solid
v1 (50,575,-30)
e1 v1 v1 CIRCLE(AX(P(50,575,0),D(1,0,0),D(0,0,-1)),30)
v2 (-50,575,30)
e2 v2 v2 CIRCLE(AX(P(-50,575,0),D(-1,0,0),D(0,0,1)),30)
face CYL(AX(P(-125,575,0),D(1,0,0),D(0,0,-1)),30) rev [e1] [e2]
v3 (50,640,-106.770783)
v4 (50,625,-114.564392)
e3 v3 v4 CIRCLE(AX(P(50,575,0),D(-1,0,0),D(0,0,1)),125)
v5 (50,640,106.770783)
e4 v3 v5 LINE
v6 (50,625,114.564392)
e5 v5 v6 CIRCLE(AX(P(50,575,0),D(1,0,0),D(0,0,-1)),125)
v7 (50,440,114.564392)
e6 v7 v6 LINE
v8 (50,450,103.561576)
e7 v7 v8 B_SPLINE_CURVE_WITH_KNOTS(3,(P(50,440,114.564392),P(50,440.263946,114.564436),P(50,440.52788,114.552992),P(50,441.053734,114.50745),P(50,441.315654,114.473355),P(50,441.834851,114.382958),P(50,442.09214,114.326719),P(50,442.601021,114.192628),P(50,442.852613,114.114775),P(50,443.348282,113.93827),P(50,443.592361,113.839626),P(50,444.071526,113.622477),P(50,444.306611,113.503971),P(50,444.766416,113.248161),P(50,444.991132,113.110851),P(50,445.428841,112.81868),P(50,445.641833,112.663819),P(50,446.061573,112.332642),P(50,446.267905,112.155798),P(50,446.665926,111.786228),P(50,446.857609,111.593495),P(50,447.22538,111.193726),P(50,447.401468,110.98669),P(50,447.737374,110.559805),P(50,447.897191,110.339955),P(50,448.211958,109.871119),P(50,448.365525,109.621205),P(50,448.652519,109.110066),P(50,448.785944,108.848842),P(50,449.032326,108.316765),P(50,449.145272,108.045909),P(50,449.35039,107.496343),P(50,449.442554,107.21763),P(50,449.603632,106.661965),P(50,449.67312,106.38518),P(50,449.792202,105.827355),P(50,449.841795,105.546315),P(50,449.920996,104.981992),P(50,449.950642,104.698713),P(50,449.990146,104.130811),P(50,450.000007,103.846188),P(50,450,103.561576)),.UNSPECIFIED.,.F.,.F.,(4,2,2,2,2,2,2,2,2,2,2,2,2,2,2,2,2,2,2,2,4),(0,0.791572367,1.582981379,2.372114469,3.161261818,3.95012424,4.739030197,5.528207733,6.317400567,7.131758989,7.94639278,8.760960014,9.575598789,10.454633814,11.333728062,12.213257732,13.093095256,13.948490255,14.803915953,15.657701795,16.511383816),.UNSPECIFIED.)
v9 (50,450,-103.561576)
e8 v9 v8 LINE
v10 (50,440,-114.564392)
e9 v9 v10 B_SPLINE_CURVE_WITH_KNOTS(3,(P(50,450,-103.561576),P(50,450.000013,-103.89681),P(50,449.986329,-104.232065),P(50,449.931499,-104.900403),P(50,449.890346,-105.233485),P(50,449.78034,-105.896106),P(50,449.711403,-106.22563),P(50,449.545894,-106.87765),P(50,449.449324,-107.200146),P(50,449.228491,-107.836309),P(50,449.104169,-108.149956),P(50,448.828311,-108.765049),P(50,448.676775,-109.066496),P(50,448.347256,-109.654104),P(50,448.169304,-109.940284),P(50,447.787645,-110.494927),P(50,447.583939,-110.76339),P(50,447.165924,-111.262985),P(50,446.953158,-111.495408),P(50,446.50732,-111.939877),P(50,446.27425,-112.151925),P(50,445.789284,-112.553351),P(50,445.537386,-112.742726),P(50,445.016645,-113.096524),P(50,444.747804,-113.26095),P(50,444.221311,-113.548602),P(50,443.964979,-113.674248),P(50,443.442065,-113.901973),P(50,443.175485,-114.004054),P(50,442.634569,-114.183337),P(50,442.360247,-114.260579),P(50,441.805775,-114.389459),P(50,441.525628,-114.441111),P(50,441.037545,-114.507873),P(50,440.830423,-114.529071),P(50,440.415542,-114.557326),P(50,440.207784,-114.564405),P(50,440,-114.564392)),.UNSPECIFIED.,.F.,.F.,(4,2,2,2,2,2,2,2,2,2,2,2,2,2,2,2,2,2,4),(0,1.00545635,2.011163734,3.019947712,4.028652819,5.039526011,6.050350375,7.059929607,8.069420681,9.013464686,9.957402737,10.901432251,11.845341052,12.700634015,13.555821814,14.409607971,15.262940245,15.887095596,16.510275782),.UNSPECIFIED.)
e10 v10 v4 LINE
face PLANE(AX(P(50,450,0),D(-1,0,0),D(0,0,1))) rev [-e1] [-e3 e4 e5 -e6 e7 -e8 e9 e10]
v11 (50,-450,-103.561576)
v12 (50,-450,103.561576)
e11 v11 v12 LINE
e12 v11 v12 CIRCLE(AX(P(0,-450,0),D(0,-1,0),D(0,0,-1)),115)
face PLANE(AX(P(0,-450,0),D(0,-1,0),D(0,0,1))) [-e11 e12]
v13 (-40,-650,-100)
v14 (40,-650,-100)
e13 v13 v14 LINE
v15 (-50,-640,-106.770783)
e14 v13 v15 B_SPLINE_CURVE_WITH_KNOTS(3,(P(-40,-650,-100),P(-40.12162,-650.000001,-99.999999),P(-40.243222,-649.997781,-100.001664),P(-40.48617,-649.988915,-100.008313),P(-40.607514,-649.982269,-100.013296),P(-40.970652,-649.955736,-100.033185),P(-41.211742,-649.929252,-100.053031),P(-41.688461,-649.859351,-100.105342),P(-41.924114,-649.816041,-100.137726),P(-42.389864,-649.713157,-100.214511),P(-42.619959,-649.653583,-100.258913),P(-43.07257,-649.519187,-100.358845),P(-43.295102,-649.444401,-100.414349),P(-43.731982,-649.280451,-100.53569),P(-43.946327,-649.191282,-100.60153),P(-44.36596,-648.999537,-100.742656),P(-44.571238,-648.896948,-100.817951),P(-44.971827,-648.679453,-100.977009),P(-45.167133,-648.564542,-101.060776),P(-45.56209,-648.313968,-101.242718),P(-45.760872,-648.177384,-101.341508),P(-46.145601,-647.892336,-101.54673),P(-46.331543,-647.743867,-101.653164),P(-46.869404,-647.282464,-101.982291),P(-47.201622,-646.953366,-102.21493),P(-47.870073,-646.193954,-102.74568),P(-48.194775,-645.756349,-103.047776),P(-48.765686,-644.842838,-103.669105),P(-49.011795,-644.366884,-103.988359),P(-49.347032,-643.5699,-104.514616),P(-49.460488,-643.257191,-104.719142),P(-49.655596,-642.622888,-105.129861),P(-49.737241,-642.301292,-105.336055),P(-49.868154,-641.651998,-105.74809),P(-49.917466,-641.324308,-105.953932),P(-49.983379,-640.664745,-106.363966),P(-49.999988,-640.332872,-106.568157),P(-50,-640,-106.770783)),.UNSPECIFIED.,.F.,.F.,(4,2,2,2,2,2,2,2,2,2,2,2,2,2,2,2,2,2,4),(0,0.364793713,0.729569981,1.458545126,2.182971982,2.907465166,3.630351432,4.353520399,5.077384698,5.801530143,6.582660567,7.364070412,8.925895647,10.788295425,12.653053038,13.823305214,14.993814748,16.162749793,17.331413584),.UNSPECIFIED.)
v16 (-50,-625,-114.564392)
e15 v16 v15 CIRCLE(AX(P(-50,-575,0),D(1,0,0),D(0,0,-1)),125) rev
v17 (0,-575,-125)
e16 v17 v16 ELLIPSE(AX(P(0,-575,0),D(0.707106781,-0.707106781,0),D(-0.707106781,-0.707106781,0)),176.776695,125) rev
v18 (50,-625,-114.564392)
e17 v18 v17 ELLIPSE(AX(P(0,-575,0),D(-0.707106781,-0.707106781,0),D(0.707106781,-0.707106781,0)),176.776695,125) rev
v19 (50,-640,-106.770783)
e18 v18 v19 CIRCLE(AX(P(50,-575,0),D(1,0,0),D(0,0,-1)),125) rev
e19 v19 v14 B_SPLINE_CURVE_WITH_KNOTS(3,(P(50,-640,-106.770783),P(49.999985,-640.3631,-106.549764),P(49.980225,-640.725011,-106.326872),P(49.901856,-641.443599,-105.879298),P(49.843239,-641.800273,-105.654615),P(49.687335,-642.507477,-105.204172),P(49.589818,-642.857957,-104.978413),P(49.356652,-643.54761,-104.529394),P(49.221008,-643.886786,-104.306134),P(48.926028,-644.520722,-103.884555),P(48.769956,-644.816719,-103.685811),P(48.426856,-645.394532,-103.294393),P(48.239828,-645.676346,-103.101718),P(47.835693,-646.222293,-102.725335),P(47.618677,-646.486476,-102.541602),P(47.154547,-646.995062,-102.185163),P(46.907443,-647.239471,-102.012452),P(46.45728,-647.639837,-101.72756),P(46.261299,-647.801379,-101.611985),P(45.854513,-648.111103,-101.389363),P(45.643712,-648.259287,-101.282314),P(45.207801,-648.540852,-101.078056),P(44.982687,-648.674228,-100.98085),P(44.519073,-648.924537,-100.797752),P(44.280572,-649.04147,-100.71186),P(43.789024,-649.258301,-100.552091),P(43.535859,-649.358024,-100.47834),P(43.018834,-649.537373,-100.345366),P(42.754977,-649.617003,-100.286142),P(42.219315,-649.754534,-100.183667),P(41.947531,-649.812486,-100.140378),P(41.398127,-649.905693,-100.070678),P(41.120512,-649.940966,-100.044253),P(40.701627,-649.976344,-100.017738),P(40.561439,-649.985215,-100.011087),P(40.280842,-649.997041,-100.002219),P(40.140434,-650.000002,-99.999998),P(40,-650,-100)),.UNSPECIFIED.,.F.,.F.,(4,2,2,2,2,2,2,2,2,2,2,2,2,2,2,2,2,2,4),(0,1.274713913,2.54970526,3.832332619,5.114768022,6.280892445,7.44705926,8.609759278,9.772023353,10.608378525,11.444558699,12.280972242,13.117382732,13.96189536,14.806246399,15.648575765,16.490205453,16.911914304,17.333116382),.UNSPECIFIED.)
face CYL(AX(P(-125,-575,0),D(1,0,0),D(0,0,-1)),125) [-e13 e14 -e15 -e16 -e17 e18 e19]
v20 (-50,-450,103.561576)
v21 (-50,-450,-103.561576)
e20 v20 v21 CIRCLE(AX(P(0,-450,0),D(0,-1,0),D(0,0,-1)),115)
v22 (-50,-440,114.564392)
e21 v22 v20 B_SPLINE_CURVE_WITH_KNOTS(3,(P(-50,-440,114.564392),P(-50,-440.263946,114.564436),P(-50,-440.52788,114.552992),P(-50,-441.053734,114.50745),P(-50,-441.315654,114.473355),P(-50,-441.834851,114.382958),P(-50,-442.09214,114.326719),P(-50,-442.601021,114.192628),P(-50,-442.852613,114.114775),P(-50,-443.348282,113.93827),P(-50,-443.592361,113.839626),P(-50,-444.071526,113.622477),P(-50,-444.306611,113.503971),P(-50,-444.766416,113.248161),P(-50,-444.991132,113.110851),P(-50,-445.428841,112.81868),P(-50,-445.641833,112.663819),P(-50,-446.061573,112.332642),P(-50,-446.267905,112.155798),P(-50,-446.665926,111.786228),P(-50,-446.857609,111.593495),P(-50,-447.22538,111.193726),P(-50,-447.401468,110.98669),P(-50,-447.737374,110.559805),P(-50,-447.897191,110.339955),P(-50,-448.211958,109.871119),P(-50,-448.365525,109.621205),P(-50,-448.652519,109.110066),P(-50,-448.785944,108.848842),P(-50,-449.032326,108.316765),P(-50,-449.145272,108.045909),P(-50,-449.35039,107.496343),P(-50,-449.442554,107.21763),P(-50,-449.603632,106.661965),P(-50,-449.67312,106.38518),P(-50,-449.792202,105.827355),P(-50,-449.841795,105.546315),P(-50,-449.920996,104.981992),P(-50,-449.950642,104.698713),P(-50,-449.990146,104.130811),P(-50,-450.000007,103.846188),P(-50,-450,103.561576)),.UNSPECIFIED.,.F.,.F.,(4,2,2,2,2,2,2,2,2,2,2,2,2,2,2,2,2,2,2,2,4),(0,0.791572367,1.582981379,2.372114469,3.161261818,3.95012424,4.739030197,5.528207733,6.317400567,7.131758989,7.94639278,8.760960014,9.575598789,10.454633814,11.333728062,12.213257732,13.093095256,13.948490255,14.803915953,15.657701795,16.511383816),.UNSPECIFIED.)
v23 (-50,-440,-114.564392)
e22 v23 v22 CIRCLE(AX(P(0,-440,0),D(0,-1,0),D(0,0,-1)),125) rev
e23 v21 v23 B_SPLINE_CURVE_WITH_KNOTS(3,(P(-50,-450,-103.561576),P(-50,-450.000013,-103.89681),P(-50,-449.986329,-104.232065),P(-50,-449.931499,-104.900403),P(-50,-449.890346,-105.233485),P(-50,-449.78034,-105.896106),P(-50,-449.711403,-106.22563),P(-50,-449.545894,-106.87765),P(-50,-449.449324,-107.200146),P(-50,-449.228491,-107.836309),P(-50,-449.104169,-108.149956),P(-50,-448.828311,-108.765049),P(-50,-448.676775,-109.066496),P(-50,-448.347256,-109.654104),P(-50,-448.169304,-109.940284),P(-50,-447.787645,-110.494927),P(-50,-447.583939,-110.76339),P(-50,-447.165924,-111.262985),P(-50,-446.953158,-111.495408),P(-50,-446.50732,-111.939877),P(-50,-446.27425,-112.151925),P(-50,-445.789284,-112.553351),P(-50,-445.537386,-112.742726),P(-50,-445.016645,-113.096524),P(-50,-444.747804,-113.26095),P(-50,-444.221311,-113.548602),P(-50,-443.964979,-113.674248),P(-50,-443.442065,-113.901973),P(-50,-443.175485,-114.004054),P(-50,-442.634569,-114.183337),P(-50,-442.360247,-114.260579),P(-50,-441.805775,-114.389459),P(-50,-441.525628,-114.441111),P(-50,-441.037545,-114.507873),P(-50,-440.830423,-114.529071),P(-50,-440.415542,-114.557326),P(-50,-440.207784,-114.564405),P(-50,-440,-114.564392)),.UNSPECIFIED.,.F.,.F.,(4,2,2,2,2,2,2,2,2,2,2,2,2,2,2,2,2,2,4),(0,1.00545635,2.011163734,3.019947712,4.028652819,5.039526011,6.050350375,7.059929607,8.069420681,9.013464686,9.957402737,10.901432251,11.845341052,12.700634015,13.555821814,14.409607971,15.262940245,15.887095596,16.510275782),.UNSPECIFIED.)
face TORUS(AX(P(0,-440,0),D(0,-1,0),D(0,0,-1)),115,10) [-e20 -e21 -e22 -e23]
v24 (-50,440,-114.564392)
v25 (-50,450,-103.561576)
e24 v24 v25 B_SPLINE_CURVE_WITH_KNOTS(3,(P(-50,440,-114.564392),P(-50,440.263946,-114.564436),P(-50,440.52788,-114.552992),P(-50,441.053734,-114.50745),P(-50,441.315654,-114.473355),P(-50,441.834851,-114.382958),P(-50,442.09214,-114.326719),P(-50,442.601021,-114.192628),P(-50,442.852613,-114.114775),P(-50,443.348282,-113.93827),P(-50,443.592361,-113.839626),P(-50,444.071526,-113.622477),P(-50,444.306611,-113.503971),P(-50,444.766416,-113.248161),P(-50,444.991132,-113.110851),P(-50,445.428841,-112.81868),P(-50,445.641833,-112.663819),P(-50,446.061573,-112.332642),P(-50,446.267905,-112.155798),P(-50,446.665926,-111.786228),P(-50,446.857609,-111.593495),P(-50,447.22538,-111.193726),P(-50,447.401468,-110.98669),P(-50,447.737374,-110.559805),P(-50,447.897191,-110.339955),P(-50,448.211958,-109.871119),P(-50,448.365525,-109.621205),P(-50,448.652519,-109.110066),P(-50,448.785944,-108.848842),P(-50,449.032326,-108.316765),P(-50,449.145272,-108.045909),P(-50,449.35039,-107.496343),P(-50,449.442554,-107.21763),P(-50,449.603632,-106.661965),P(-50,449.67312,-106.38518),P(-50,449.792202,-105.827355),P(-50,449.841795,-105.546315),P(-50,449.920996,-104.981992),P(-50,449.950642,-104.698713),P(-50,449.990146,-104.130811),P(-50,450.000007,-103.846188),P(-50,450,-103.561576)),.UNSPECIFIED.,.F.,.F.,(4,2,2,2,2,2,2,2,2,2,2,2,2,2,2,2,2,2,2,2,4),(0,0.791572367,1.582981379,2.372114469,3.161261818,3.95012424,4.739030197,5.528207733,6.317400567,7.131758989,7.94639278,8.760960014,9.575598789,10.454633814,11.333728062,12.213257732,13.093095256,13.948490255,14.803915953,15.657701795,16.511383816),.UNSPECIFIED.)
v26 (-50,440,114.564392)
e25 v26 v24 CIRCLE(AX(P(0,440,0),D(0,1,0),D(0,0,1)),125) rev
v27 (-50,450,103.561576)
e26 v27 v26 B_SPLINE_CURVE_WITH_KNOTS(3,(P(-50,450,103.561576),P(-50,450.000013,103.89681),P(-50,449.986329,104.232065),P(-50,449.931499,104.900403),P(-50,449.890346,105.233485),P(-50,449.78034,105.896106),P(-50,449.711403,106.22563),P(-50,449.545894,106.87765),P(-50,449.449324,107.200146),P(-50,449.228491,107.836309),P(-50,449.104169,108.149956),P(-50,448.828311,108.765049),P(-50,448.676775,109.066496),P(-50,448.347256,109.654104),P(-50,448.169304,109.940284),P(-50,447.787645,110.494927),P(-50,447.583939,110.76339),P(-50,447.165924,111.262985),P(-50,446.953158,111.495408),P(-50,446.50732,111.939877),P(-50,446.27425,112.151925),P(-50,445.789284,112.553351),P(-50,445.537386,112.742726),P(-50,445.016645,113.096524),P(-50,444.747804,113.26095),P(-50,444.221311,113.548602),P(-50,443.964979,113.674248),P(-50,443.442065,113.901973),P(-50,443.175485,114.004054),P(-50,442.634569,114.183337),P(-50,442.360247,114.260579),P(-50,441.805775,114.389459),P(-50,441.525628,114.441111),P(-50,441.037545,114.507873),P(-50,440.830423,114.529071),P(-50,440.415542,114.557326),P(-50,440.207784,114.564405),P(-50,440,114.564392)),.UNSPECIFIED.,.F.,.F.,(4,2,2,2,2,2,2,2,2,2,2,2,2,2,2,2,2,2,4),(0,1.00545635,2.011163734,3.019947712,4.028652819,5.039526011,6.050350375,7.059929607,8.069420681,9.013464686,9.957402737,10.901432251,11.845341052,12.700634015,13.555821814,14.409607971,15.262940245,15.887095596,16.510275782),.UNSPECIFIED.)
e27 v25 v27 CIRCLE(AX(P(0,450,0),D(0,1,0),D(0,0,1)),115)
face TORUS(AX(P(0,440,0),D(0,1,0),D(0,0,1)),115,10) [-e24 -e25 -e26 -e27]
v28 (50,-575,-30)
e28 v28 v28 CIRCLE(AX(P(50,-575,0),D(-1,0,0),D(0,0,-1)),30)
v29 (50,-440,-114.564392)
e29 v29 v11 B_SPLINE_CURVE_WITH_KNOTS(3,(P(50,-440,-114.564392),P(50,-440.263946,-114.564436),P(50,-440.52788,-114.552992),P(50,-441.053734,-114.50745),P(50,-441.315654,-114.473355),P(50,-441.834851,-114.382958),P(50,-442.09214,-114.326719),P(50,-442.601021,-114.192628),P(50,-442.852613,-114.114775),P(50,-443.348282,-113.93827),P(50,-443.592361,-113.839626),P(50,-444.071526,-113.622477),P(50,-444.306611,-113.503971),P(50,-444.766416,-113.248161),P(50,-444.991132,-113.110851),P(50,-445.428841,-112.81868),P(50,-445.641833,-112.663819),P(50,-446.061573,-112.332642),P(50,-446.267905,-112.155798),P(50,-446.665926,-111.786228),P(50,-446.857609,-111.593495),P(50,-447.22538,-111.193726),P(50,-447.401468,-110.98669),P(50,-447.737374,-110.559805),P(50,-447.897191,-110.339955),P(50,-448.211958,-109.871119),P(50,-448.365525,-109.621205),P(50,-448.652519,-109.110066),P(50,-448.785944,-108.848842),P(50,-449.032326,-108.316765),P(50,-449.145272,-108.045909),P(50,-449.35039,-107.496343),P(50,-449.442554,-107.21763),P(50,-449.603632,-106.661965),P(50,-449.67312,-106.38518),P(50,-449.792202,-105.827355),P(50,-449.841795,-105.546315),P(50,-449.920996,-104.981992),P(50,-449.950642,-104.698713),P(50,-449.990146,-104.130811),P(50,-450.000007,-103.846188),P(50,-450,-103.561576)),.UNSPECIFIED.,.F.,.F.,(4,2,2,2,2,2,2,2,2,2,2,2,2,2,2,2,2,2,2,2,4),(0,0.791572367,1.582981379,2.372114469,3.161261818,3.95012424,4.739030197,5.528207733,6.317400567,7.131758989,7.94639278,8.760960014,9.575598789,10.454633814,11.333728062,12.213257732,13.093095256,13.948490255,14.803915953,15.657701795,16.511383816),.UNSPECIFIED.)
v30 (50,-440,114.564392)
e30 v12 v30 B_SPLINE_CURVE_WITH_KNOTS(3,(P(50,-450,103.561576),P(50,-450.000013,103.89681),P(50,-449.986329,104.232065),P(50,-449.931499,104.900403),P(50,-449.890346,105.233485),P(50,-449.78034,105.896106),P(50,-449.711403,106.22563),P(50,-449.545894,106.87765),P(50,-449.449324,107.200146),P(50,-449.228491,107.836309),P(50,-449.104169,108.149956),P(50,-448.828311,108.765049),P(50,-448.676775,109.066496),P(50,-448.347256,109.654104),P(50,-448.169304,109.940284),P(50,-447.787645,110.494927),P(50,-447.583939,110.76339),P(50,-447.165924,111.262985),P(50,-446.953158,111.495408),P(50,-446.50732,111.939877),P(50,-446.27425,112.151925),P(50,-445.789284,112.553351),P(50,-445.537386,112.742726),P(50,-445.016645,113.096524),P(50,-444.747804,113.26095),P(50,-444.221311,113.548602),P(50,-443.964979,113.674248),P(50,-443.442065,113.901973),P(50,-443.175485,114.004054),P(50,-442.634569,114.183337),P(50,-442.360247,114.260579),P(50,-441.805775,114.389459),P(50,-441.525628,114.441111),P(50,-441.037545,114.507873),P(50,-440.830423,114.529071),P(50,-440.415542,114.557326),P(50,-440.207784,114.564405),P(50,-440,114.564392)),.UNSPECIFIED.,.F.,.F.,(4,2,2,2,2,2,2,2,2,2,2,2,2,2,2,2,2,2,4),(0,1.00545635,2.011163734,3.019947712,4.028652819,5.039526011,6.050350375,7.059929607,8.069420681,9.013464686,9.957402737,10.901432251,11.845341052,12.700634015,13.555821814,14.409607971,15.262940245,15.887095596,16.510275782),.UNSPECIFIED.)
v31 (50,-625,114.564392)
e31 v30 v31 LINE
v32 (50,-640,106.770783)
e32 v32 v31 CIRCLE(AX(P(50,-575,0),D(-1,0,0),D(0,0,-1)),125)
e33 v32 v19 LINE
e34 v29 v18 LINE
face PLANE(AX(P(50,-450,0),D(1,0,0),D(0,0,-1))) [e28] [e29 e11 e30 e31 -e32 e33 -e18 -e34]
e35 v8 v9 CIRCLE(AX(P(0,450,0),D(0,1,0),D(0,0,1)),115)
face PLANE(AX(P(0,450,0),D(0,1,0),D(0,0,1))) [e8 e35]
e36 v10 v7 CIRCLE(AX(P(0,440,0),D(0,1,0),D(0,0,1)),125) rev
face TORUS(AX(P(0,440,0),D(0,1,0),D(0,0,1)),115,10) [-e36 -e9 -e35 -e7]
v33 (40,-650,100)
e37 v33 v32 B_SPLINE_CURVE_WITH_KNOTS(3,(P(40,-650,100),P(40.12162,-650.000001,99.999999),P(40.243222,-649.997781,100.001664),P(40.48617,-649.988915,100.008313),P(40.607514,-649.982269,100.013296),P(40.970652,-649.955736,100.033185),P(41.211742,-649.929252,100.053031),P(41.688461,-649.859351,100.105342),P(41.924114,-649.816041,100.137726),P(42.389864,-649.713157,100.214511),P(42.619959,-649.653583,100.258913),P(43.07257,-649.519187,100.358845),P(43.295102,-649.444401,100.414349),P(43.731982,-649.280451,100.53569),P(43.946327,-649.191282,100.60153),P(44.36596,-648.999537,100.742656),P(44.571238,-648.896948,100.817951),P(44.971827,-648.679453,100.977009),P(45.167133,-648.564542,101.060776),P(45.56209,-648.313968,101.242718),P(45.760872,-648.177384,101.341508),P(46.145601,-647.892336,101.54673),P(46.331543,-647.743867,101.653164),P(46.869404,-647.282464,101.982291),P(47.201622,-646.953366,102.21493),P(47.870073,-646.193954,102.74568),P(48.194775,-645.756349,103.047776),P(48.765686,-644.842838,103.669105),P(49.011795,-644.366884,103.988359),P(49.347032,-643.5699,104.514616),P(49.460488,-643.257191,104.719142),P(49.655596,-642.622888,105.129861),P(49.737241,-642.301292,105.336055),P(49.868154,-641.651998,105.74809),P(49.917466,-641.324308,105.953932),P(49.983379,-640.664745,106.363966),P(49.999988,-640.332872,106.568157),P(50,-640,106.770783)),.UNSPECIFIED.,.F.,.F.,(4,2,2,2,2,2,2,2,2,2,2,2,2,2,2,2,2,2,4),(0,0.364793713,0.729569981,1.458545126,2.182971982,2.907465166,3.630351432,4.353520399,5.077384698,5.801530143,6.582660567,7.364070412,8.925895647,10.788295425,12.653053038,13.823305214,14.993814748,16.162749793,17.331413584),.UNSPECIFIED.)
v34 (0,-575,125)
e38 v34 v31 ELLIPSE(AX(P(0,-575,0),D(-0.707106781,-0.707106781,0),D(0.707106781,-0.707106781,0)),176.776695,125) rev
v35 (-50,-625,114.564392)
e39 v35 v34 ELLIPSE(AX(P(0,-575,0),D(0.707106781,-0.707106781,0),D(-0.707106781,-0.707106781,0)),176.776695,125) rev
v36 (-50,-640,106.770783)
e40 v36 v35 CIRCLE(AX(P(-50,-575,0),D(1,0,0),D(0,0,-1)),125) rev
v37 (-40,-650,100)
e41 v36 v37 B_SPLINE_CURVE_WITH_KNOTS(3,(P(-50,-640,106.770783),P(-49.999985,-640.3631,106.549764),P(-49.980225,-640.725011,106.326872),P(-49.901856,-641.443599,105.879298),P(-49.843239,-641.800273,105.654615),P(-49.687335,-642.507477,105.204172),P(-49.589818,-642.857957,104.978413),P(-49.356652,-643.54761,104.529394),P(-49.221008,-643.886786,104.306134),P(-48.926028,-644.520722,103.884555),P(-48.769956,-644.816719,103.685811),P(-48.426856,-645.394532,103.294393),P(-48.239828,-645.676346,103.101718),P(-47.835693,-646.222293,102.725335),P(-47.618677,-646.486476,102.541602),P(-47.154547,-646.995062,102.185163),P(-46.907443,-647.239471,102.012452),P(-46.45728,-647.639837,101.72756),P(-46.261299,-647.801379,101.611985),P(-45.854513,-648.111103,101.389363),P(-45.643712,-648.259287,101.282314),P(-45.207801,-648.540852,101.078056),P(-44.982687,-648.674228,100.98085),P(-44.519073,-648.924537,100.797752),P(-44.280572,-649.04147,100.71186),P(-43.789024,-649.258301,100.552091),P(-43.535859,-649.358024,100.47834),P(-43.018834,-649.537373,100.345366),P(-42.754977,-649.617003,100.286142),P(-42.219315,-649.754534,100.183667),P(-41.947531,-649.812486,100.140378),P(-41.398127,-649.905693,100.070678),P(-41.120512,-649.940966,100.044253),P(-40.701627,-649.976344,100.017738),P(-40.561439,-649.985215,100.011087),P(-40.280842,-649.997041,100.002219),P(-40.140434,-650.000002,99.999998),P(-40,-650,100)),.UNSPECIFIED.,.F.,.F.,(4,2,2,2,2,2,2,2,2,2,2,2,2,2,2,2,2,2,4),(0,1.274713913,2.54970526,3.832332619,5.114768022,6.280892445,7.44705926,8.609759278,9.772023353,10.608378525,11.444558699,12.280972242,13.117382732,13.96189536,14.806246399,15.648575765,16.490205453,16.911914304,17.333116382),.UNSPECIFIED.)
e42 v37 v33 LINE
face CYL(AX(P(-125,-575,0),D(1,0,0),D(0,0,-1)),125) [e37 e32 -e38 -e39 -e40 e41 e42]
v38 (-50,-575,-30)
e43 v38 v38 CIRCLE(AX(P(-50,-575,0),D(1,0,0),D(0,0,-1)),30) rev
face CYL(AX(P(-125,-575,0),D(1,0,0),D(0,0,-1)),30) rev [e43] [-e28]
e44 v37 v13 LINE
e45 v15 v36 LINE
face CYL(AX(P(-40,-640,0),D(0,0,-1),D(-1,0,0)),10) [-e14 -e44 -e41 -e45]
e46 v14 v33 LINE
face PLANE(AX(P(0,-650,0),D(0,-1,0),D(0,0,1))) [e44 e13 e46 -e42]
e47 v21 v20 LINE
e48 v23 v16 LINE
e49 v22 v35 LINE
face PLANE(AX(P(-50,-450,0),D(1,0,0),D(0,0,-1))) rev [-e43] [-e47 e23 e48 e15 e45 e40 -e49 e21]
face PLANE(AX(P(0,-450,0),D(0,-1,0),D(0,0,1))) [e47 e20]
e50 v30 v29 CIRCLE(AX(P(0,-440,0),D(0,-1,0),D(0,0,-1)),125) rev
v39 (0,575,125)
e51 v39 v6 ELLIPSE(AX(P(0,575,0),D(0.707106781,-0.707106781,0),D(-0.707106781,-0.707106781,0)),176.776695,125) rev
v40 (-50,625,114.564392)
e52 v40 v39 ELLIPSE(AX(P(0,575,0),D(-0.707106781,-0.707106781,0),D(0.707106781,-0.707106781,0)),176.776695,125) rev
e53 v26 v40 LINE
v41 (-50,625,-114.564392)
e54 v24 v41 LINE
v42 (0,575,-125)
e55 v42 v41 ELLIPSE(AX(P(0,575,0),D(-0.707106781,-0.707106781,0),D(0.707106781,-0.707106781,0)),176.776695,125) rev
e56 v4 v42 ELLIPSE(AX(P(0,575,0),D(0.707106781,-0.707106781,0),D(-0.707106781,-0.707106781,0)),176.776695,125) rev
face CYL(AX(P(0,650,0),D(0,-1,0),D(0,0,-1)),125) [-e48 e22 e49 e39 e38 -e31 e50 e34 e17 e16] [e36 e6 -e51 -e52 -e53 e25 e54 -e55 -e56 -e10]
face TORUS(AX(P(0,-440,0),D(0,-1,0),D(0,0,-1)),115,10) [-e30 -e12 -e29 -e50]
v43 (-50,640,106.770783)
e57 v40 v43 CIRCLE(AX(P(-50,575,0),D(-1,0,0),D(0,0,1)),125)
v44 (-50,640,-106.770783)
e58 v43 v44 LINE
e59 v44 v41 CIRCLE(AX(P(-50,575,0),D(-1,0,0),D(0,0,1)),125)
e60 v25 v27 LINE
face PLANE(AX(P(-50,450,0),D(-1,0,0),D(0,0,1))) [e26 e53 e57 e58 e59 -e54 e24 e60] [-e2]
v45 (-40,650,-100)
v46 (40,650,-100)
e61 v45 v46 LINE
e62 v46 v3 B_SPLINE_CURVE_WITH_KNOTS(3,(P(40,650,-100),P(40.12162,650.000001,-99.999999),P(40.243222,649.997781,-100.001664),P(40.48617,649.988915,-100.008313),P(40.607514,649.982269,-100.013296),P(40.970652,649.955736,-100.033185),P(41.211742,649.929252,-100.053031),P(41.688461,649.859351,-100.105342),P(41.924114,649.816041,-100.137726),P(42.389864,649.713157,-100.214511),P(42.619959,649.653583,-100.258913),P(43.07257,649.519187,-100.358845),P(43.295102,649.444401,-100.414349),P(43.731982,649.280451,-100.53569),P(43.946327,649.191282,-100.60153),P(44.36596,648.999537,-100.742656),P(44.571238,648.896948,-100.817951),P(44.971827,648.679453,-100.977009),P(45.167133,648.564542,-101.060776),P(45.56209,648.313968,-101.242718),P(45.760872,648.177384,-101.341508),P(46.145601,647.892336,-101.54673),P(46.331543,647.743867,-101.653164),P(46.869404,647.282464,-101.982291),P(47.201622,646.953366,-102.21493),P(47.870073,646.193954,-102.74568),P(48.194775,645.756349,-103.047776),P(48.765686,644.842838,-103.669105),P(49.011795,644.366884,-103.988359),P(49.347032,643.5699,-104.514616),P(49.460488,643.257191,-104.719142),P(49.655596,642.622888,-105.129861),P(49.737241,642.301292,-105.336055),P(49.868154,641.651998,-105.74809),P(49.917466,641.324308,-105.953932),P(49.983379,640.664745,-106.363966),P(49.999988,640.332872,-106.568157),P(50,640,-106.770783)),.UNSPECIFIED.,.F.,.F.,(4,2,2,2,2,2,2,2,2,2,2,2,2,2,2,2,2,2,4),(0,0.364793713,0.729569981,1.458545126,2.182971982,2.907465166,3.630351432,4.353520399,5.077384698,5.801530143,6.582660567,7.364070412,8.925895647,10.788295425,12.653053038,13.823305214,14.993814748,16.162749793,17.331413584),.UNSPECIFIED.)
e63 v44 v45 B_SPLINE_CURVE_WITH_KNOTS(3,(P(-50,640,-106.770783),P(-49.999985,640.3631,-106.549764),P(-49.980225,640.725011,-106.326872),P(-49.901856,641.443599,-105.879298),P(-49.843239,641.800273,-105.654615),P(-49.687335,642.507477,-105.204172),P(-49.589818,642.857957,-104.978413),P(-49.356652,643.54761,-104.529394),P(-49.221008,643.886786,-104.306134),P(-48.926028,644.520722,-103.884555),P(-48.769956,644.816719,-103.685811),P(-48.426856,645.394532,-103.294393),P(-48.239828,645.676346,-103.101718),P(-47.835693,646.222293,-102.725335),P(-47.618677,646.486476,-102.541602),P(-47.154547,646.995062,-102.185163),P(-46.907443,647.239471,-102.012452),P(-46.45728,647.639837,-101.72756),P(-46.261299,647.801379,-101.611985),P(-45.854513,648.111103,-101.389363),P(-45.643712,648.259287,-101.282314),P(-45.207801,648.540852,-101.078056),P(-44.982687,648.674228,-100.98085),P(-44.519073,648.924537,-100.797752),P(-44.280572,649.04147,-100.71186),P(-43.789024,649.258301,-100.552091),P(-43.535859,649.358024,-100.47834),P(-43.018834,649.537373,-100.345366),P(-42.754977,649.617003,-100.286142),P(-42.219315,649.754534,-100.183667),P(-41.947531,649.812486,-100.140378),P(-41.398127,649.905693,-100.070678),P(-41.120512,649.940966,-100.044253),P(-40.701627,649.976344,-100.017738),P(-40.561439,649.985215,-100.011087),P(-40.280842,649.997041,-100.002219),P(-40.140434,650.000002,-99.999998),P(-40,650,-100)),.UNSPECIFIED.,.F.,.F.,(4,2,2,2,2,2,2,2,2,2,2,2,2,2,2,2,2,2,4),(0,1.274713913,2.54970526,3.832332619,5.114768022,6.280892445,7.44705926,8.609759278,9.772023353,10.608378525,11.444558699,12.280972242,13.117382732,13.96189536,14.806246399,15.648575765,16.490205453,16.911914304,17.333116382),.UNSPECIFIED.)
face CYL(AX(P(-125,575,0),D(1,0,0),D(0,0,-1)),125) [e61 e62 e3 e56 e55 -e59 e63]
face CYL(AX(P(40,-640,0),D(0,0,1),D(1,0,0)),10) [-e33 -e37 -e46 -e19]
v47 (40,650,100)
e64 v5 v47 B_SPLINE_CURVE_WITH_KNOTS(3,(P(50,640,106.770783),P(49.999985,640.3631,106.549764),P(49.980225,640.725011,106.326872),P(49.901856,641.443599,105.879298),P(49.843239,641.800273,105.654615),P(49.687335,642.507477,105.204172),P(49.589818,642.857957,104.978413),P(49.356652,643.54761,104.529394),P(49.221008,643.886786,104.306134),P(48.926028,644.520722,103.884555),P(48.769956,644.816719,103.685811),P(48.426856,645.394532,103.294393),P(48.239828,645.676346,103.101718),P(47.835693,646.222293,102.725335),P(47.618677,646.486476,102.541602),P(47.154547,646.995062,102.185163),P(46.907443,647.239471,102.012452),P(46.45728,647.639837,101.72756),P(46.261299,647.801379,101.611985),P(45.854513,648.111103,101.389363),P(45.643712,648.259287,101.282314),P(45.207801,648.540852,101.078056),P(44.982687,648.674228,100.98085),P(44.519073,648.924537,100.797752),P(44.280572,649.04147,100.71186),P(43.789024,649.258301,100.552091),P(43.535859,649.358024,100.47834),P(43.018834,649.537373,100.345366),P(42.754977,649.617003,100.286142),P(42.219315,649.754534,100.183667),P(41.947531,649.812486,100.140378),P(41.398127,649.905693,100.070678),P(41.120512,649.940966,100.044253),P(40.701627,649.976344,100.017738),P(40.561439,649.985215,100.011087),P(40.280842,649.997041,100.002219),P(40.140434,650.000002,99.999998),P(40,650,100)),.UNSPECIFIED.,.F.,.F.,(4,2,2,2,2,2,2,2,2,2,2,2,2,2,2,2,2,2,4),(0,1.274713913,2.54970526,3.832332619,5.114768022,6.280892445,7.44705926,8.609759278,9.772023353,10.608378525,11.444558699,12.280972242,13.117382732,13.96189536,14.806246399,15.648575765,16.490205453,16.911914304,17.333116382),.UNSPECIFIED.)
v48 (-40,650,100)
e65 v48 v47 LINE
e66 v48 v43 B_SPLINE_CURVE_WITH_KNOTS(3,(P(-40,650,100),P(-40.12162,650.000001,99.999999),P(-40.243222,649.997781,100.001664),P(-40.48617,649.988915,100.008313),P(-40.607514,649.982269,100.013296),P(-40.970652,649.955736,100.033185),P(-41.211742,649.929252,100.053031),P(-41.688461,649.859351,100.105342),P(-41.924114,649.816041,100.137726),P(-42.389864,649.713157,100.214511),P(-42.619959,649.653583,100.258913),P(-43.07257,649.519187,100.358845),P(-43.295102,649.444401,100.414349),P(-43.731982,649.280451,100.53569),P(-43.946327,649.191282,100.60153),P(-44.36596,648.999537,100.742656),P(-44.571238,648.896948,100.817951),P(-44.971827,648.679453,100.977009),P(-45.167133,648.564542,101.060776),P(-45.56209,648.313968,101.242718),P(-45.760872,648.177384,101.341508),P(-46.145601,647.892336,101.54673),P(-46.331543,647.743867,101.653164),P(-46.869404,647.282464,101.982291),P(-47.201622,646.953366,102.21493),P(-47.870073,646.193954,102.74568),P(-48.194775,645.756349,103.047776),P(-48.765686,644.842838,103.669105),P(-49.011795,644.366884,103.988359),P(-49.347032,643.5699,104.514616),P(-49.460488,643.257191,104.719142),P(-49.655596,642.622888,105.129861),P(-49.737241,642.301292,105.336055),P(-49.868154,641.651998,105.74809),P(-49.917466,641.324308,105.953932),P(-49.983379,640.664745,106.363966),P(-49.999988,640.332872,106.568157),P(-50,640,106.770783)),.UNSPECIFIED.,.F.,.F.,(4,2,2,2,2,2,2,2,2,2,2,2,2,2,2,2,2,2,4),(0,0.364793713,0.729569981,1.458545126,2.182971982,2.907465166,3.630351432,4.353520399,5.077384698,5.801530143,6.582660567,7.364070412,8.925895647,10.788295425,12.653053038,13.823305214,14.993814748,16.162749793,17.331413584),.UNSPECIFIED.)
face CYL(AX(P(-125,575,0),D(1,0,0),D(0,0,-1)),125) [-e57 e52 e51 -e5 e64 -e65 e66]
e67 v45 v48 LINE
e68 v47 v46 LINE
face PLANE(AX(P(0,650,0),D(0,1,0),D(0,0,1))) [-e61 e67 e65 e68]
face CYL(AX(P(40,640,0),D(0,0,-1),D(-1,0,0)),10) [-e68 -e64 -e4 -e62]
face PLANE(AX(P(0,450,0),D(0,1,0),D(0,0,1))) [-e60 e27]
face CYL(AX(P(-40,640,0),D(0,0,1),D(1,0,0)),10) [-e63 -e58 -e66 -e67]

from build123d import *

# Parameters (mm, degrees)
SKETCH1_R            = 124.99999999999999
BOSS_EXTRUDE1_DEPTH  = 650
CUT_EXTRUDE1_START   = -200
CUT_EXTRUDE1_DEPTH   = 200
SKETCH4_R            = 30.000000000000007
CUT_EXTRUDE4_DEPTH   = 685.6531968814577
FILLET2_R            = 10
FILLET2_OF_MIRROR4_R = 10
FILLET3_R            = 10
FILLET4_R            = 10


with BuildPart() as part:
    # Sketch1 → Boss-Extrude1 (new body)
    with BuildSketch(Plane(origin=(0, 0, 0), x_dir=(1, 0, 0), z_dir=(0, 1, 0))):
        Circle(SKETCH1_R)
    boss_extrude1 = extrude(amount=BOSS_EXTRUDE1_DEPTH)

    # Sketch2 → Cut-Extrude1 (cut)
    with BuildSketch(Plane(origin=(0, 650, 0), x_dir=(1, 0, 0), z_dir=(0, 1, 0)).offset(CUT_EXTRUDE1_START)):
        with BuildLine():
            Line((-50, -114.56439237389277), (-50, 114.56439237389277))
            ThreePointArc((-50.00000000000426, 114.56439237389412), (-124.99999999999999, 1.531e-14), (-50.00000000000437, -114.56439237389408))
        make_face()
        with BuildLine():
            ThreePointArc((49.99999999999955, -114.56439237389618), (124.99999999999999, 7.11e-15), (49.99999999999953, 114.5643923738962))
            Line((50, 114.56439237389633), (50, -114.56439237389633))
        make_face()
    cut_extrude1 = extrude(amount=CUT_EXTRUDE1_DEPTH, mode=Mode.SUBTRACT)

    # Sketch4 → Cut-Extrude4 (cut, through all)
    with BuildSketch(Plane(origin=(50, 0, 0), x_dir=(0, 0, -1), z_dir=(1, 0, 0))):
        with BuildLine():
            Line((124.99999999999999, 575.0000000000001), (124.99999999999999, 650))
            Line((124.99999999999999, 650), (99.99999999999793, 650.0000000000014))
            ThreePointArc((99.99999999999865, 650.0000000000019), (118.58541225631386, 614.5284707521059), (125, 575.0000000000001))
        make_face()
        with BuildLine():
            Line((-99.99999999999793, 650.0000000000014), (-124.99999999999999, 650))
            Line((-124.99999999999999, 650), (-124.99999999999999, 575.0000000000001))
            ThreePointArc((-124.99999999999999, 575.0000000000001), (-118.58541225631386, 614.5284707521059), (-99.99999999999864, 650.0000000000019))
        make_face()
        with Locations((0, 575.0000000000001)):
            Circle(SKETCH4_R)
    cut_extrude4 = extrude(amount=-CUT_EXTRUDE4_DEPTH, mode=Mode.SUBTRACT)

    # Fillet2
    fillet2_edges = [part.edges().sort_by_distance(p)[0] for p in [
        (50, 650, -1.421e-14),
        (-50, 650, 0),
    ]]
    fillet(fillet2_edges, radius=FILLET2_R)

    # Mirror4: Boss-Extrude1, Cut-Extrude1, Cut-Extrude4 across plane
    add(boss_extrude1.mirror(Plane(origin=(0, 0, 0), x_dir=(0, 0, 1), z_dir=(0, -1, 0))))
    add(cut_extrude1.mirror(Plane(origin=(0, 0, 0), x_dir=(0, 0, 1), z_dir=(0, -1, 0))), mode=Mode.SUBTRACT)
    add(cut_extrude4.mirror(Plane(origin=(0, 0, 0), x_dir=(0, 0, 1), z_dir=(0, -1, 0))), mode=Mode.SUBTRACT)

    # Fillet2 of Mirror4
    fillet2_of_mirror4_edges = [part.edges().sort_by_distance(p)[0] for p in [
        (50, -650, -1.421e-14),
        (-50, -650, 0),
    ]]
    fillet(fillet2_of_mirror4_edges, radius=FILLET2_OF_MIRROR4_R)

    # Fillet3
    fillet3_edges = [part.edges().sort_by_distance(p)[0] for p in [
        (104.58250331675968, 450, -68.46531968814539),
        (-124.99999999999999, 450, -6.04e-14),
    ]]
    fillet(fillet3_edges, radius=FILLET3_R)

    # Fillet4
    fillet4_edges = [part.edges().sort_by_distance(p)[0] for p in [
        (-124.99999999999999, -450, -6.04e-14),
        (104.58250331675968, -450, -68.46531968814539),
    ]]
    fillet(fillet4_edges, radius=FILLET4_R)


solid = part.part
